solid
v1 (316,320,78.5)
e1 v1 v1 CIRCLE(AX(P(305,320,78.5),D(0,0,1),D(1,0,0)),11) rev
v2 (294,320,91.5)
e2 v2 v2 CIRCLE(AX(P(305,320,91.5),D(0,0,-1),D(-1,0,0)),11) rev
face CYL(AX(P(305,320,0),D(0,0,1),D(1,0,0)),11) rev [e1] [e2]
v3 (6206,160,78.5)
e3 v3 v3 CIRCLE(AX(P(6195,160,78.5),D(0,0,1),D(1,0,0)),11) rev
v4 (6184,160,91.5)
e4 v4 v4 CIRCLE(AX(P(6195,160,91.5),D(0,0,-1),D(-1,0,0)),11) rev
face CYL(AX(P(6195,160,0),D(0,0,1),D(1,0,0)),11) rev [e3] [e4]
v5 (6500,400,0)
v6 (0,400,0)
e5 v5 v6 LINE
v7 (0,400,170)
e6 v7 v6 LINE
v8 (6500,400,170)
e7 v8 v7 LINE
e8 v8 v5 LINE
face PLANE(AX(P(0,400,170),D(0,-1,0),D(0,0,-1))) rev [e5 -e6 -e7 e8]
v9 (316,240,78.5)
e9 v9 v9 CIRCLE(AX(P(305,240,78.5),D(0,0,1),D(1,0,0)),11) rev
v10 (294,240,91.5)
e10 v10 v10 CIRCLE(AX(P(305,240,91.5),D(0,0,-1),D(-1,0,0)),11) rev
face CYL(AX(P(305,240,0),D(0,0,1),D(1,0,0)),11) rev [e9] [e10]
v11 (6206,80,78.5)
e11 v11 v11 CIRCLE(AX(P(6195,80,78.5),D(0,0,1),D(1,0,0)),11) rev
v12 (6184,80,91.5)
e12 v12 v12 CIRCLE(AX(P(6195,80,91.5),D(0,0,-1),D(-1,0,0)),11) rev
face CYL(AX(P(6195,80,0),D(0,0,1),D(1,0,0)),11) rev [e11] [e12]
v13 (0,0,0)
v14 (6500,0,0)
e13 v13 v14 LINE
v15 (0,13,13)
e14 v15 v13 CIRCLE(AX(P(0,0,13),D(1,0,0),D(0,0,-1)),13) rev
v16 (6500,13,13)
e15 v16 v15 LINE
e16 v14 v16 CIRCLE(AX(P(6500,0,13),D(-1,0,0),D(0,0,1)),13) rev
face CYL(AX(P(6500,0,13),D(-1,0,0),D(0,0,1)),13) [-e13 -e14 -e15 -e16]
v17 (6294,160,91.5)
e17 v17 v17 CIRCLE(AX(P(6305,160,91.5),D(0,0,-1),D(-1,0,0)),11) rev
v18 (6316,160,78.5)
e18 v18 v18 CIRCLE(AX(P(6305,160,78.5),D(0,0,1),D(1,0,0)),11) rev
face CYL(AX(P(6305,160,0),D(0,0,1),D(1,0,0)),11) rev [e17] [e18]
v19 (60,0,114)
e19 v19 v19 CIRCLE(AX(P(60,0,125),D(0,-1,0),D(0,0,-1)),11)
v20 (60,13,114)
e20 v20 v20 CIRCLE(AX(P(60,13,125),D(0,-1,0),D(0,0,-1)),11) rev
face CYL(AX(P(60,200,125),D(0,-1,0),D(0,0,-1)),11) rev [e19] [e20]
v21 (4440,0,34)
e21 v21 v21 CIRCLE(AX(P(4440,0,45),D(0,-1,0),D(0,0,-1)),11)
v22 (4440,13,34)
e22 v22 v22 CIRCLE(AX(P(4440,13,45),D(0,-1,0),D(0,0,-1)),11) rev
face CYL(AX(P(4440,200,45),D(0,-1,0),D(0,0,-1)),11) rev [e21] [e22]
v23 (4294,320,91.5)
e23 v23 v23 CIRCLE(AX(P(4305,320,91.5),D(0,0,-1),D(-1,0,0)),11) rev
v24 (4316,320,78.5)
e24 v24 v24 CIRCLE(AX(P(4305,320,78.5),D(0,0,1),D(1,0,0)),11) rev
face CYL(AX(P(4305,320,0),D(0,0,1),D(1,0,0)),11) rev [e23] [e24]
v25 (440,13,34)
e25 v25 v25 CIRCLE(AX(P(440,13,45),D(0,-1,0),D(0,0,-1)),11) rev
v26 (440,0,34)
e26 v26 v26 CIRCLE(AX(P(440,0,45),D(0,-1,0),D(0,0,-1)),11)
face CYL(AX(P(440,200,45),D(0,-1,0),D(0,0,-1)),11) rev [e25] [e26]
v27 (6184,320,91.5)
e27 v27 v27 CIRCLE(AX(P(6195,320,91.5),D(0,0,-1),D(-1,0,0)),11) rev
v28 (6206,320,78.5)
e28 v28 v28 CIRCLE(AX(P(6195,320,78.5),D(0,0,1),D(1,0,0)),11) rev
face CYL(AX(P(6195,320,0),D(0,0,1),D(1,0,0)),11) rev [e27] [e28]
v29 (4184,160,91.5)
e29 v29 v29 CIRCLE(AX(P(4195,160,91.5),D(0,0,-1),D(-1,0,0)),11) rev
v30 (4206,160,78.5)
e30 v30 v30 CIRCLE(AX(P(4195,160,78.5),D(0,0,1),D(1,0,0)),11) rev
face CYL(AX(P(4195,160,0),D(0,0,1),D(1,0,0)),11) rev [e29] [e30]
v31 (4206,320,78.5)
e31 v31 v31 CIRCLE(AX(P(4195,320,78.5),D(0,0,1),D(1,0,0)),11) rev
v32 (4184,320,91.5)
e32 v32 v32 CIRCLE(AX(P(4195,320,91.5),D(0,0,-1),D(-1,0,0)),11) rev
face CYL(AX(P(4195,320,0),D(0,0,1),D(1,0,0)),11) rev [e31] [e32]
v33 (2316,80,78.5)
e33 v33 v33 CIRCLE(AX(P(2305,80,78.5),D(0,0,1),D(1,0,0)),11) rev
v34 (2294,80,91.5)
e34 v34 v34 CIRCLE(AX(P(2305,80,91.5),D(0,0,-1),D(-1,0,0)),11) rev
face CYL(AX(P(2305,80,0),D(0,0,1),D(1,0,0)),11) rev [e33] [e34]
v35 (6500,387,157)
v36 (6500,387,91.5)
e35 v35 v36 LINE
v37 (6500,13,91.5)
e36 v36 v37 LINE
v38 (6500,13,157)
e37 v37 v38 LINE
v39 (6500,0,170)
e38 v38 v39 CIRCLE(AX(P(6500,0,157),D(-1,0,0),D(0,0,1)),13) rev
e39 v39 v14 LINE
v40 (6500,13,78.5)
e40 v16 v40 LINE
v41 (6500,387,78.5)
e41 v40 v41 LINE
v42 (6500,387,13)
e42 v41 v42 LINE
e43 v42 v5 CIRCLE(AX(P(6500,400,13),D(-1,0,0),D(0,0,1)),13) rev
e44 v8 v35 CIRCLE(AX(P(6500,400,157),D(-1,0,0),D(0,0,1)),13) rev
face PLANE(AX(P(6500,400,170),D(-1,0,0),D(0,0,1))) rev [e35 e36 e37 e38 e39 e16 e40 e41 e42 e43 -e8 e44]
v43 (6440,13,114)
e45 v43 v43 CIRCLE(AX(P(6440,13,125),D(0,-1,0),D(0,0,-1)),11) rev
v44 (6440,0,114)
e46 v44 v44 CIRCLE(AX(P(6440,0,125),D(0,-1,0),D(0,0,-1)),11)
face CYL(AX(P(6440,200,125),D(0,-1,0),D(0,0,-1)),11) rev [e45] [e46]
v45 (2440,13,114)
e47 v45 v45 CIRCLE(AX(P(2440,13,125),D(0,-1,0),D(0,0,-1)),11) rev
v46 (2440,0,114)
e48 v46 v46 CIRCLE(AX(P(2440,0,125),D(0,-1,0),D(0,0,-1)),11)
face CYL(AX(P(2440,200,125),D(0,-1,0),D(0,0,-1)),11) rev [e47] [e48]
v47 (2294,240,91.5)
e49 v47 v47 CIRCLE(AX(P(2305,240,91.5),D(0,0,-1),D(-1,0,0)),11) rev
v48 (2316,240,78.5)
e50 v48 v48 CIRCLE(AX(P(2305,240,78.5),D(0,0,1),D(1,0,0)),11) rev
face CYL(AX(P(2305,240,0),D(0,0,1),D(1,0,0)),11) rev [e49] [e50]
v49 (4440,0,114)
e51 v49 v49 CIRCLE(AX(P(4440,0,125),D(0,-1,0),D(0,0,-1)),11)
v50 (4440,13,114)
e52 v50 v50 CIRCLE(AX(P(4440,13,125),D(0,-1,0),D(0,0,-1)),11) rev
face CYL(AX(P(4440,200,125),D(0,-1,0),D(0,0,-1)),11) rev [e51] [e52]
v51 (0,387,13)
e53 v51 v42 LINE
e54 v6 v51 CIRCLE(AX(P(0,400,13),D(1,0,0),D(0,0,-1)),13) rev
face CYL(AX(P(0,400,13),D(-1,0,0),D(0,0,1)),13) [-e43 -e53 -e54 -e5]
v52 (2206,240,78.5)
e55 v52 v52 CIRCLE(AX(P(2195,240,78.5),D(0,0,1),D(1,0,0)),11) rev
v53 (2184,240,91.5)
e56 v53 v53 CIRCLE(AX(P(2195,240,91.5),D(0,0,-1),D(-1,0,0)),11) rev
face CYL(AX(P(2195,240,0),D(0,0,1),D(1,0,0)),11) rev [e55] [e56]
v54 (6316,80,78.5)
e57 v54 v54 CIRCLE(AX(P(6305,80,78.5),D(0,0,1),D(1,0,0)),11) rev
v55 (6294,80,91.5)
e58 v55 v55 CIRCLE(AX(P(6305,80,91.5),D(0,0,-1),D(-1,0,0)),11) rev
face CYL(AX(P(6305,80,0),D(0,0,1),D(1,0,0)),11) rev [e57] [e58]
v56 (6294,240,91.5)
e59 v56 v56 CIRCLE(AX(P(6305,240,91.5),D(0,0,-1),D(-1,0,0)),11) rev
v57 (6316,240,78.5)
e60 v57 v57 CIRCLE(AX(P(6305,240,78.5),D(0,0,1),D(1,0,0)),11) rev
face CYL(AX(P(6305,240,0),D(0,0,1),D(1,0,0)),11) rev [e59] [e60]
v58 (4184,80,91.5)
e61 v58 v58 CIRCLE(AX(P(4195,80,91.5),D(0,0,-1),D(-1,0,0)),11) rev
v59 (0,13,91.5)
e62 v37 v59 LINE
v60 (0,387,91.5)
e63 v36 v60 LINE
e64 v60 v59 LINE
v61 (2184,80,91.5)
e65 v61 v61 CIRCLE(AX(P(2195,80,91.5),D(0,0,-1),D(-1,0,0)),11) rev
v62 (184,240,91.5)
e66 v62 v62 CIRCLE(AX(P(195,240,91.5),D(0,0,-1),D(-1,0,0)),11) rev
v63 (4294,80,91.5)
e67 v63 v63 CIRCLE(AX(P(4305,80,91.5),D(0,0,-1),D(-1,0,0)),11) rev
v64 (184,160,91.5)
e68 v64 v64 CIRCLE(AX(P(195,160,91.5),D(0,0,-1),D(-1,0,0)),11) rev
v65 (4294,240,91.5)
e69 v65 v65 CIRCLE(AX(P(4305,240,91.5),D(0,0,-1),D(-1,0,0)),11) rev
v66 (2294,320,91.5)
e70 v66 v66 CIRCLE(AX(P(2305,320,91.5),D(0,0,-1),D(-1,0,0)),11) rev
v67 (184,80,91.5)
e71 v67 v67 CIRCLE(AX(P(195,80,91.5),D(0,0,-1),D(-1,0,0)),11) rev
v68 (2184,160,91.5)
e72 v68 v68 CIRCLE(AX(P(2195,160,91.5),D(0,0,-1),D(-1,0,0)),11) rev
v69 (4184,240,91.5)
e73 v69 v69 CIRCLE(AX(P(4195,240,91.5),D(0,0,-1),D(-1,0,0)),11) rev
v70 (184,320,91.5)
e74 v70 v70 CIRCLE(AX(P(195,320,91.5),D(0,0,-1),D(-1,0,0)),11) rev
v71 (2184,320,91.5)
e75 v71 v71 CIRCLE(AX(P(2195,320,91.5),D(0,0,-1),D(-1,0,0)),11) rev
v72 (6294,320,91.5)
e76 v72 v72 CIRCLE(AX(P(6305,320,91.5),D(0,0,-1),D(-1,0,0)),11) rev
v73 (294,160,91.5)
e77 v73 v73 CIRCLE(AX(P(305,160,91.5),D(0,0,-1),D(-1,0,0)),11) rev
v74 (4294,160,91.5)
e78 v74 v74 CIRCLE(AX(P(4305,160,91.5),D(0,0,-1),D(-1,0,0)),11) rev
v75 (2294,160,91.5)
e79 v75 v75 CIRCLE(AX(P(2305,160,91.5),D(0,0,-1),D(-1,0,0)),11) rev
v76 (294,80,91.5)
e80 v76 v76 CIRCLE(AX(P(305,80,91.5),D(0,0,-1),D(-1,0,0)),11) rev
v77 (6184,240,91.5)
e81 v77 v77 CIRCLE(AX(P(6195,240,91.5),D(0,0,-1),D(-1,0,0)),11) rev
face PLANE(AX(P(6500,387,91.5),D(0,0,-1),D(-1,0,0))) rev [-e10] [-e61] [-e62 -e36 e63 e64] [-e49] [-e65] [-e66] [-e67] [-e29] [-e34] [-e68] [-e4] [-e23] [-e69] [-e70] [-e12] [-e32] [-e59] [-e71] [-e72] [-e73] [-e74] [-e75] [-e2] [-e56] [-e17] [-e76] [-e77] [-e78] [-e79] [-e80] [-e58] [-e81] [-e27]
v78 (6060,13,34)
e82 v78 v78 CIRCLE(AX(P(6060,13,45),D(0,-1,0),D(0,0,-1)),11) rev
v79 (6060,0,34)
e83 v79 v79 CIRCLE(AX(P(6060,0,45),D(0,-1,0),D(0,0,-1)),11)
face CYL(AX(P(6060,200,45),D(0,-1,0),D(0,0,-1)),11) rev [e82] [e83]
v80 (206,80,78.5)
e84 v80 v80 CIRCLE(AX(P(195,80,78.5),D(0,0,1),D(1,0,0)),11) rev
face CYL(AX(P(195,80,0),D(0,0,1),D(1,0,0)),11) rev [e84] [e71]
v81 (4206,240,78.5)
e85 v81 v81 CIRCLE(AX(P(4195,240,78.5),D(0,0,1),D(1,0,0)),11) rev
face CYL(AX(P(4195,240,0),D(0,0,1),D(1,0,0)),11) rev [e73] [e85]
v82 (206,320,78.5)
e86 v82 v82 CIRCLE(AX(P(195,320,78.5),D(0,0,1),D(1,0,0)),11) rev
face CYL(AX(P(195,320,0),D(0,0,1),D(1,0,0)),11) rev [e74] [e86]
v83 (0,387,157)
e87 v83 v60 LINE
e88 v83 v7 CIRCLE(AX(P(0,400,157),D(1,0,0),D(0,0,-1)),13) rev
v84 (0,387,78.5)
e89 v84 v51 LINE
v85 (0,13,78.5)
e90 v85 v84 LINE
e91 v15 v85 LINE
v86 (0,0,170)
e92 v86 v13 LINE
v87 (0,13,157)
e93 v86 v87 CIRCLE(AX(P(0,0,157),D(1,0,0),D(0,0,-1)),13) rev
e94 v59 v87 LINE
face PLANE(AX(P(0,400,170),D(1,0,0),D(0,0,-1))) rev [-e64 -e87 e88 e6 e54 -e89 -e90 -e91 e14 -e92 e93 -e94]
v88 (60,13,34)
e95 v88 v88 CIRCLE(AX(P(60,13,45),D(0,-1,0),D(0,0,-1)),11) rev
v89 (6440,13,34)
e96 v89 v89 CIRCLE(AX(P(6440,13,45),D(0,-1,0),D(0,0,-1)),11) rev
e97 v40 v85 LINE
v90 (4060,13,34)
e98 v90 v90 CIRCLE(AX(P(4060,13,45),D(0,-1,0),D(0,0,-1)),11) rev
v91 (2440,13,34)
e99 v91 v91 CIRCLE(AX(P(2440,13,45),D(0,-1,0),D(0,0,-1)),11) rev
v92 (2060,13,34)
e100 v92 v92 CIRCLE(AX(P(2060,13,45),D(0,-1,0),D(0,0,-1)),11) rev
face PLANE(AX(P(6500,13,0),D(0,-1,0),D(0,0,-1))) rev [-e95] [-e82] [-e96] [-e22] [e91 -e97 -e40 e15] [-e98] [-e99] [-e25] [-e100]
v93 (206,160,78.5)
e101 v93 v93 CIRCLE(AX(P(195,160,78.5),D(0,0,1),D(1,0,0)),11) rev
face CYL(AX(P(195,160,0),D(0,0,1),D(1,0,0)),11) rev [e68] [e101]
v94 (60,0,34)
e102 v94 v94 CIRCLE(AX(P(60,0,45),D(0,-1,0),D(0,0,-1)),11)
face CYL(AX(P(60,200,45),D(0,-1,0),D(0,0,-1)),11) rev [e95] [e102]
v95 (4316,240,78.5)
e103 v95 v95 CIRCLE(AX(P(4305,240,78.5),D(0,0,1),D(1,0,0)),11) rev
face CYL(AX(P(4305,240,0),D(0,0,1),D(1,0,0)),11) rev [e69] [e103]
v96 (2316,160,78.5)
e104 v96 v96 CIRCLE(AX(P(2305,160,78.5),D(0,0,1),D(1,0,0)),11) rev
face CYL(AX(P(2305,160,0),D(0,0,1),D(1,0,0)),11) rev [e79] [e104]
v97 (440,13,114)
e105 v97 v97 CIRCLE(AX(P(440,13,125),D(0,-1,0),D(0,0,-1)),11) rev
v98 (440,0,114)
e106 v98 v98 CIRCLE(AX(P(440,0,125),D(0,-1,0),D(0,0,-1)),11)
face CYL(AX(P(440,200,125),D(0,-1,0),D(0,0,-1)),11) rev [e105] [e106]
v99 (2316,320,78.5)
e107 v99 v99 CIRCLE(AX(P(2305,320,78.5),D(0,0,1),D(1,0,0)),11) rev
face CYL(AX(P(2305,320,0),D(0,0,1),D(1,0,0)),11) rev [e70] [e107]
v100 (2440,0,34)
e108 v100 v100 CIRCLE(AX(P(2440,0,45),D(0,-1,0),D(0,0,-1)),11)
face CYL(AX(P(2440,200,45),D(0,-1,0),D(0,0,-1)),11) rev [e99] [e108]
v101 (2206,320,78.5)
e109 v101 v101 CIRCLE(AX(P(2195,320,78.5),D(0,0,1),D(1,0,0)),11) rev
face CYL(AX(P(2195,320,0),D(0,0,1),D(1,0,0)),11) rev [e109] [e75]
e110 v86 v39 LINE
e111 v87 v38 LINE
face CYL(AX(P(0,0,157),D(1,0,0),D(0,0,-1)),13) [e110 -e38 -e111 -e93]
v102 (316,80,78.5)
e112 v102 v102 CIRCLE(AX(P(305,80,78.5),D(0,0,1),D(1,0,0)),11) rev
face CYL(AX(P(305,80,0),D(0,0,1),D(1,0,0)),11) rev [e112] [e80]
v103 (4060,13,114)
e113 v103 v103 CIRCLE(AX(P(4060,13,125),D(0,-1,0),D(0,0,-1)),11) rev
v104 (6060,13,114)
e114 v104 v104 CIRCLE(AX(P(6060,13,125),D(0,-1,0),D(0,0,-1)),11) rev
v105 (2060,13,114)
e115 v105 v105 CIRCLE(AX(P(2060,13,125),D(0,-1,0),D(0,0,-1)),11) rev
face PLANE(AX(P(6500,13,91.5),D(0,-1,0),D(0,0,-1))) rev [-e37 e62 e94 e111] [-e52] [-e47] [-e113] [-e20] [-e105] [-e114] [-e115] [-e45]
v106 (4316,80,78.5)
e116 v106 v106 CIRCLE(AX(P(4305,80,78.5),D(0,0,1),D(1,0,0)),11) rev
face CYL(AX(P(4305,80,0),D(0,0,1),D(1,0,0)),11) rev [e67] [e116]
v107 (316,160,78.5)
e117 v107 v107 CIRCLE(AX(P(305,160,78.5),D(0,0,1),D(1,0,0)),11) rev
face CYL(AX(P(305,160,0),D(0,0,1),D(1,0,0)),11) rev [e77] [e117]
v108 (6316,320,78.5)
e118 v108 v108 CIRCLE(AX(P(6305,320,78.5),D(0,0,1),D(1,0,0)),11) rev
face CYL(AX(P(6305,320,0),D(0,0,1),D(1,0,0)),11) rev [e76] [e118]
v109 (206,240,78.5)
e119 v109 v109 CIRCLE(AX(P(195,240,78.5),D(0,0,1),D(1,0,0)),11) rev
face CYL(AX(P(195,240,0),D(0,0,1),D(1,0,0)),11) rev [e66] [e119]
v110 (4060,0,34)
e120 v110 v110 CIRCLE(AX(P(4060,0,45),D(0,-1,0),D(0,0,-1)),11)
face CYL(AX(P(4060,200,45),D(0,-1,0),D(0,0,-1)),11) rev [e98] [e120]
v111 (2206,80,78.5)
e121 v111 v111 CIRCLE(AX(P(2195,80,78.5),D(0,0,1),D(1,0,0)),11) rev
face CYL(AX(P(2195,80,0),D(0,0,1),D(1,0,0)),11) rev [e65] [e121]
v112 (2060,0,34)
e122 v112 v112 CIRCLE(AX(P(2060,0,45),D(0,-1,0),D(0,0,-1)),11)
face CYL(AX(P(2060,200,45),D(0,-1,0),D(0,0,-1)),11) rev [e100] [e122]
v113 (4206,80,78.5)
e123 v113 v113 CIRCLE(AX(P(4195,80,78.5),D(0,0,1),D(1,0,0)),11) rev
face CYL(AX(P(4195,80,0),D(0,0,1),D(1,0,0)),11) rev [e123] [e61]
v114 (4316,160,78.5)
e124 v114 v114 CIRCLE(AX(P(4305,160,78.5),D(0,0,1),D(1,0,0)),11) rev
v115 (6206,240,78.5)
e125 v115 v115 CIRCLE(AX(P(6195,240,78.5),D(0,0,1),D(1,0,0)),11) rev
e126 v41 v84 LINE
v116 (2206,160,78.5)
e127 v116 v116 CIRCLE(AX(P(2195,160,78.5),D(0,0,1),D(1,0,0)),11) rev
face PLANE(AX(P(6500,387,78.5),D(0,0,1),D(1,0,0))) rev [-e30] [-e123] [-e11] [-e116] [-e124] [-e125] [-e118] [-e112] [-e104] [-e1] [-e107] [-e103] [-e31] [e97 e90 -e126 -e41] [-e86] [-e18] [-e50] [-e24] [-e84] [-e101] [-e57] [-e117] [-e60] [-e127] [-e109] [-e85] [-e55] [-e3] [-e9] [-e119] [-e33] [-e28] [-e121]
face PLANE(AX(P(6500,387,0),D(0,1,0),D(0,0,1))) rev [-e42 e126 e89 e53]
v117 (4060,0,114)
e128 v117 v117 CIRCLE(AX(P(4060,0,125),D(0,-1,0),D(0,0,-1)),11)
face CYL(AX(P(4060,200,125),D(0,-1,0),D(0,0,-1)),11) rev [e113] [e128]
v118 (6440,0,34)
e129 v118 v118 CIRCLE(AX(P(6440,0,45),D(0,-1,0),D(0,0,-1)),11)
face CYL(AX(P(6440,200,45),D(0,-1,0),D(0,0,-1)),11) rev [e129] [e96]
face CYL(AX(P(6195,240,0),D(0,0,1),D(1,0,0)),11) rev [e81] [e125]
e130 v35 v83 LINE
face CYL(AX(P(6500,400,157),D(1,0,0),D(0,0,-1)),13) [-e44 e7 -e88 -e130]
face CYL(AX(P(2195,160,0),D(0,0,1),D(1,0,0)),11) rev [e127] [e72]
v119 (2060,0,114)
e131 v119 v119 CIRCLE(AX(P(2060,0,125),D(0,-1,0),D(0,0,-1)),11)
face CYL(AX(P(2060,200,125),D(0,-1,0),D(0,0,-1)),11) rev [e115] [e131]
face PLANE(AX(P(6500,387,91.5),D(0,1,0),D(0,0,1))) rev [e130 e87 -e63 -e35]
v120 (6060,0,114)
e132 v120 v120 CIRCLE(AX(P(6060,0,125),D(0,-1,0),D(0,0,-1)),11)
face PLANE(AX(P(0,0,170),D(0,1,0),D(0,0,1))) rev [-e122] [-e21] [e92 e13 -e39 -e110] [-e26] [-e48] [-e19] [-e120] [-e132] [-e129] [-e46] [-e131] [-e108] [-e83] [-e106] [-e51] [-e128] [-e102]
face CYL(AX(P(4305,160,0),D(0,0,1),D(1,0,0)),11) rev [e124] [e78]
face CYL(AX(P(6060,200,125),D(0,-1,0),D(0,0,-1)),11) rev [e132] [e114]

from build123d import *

# Parameters (mm, degrees)
SKETCH_1_W                        = 6500
SKETCH_1_H                        = 400
EXTRUDE_1_DEPTH                   = 170
SKETCH_2_R                        = 11
CUT_EXTRUDE_1_DEPTH               = 6515.514563649
PATTERN_LINEAR_1_COUNT            = 4
PATTERN_LINEAR_1_PITCH            = 80
PATTERN_LINEAR_2_COUNT            = 2
PATTERN_LINEAR_2_PITCH            = 110
PATTERN_LINEAR_2_COPY_1_SKETCH_R  = 11
PATTERN_LINEAR_2_COPY_1_DEPTH     = 6515.514563649
PATTERN_LINEAR_2_COPY_2_SKETCH_R  = 11
PATTERN_LINEAR_2_COPY_2_DEPTH     = 6515.514563649
PATTERN_LINEAR_2_COPY_3_SKETCH_R  = 11
PATTERN_LINEAR_2_COPY_3_DEPTH     = 6515.514563649
PATTERN_LINEAR_3_COUNT            = 4
PATTERN_LINEAR_3_PITCH            = 2000
PATTERN_LINEAR_3_COPY_1_SKETCH_R  = 11
PATTERN_LINEAR_3_COPY_1_DEPTH     = 6515.514563649
PATTERN_LINEAR_3_COPY_2_SKETCH_R  = 11
PATTERN_LINEAR_3_COPY_2_DEPTH     = 6515.514563649
PATTERN_LINEAR_3_COPY_3_SKETCH_R  = 11
PATTERN_LINEAR_3_COPY_3_DEPTH     = 6515.514563649
PATTERN_LINEAR_3_COPY_4_SKETCH_R  = 11
PATTERN_LINEAR_3_COPY_4_DEPTH     = 6515.514563649
PATTERN_LINEAR_3_COPY_5_SKETCH_R  = 11
PATTERN_LINEAR_3_COPY_5_DEPTH     = 6515.514563649
PATTERN_LINEAR_3_COPY_6_SKETCH_R  = 11
PATTERN_LINEAR_3_COPY_6_DEPTH     = 6515.514563649
PATTERN_LINEAR_3_COPY_7_SKETCH_R  = 11
PATTERN_LINEAR_3_COPY_7_DEPTH     = 6515.514563649
PATTERN_LINEAR_3_COPY_8_SKETCH_R  = 11
PATTERN_LINEAR_3_COPY_8_DEPTH     = 6515.514563649
PATTERN_LINEAR_3_COPY_9_SKETCH_R  = 11
PATTERN_LINEAR_3_COPY_9_DEPTH     = 6515.514563649
PATTERN_LINEAR_3_COPY_10_SKETCH_R = 11
PATTERN_LINEAR_3_COPY_10_DEPTH    = 6515.514563649
PATTERN_LINEAR_3_COPY_11_SKETCH_R = 11
PATTERN_LINEAR_3_COPY_11_DEPTH    = 6515.514563649
PATTERN_LINEAR_3_COPY_12_SKETCH_R = 11
PATTERN_LINEAR_3_COPY_12_DEPTH    = 6515.514563649
PATTERN_LINEAR_3_COPY_13_SKETCH_R = 11
PATTERN_LINEAR_3_COPY_13_DEPTH    = 6515.514563649
PATTERN_LINEAR_3_COPY_14_SKETCH_R = 11
PATTERN_LINEAR_3_COPY_14_DEPTH    = 6515.514563649
PATTERN_LINEAR_3_COPY_15_SKETCH_R = 11
PATTERN_LINEAR_3_COPY_15_DEPTH    = 6515.514563649
PATTERN_LINEAR_3_COPY_16_SKETCH_R = 11
PATTERN_LINEAR_3_COPY_16_DEPTH    = 6515.514563649
PATTERN_LINEAR_3_COPY_17_SKETCH_R = 11
PATTERN_LINEAR_3_COPY_17_DEPTH    = 6515.514563649
PATTERN_LINEAR_3_COPY_18_SKETCH_R = 11
PATTERN_LINEAR_3_COPY_18_DEPTH    = 6515.514563649
PATTERN_LINEAR_3_COPY_19_SKETCH_R = 11
PATTERN_LINEAR_3_COPY_19_DEPTH    = 6515.514563649
PATTERN_LINEAR_3_COPY_20_SKETCH_R = 11
PATTERN_LINEAR_3_COPY_20_DEPTH    = 6515.514563649
PATTERN_LINEAR_3_COPY_21_SKETCH_R = 11
PATTERN_LINEAR_3_COPY_21_DEPTH    = 6515.514563649
SKETCH_3_R                        = 11
CUT_EXTRUDE_2_DEPTH               = 200
PATTERN_LINEAR_4_COUNT            = 2
PATTERN_LINEAR_4_PITCH            = 80
PATTERN_LINEAR_5_COUNT            = 2
PATTERN_LINEAR_5_PITCH            = 380
PATTERN_LINEAR_5_COPY_1_SKETCH_R  = 11
PATTERN_LINEAR_5_COPY_1_DEPTH     = 200
PATTERN_LINEAR_6_COUNT            = 4
PATTERN_LINEAR_6_PITCH            = 2000
PATTERN_LINEAR_6_COPY_1_SKETCH_R  = 11
PATTERN_LINEAR_6_COPY_1_DEPTH     = 200
PATTERN_LINEAR_6_COPY_2_SKETCH_R  = 11
PATTERN_LINEAR_6_COPY_2_DEPTH     = 200
PATTERN_LINEAR_6_COPY_3_SKETCH_R  = 11
PATTERN_LINEAR_6_COPY_3_DEPTH     = 200
PATTERN_LINEAR_6_COPY_4_SKETCH_R  = 11
PATTERN_LINEAR_6_COPY_4_DEPTH     = 200
PATTERN_LINEAR_6_COPY_5_SKETCH_R  = 11
PATTERN_LINEAR_6_COPY_5_DEPTH     = 200
PATTERN_LINEAR_6_COPY_6_SKETCH_R  = 11
PATTERN_LINEAR_6_COPY_6_DEPTH     = 200
PATTERN_LINEAR_6_COPY_7_SKETCH_R  = 11
PATTERN_LINEAR_6_COPY_7_DEPTH     = 200
PATTERN_LINEAR_6_COPY_8_SKETCH_R  = 11
PATTERN_LINEAR_6_COPY_8_DEPTH     = 200
PATTERN_LINEAR_6_COPY_9_SKETCH_R  = 11
PATTERN_LINEAR_6_COPY_9_DEPTH     = 200
SKETCH_5_W                        = 78.5
SKETCH_5_H                        = 374
CUT_EXTRUDE_3_DEPTH               = 6515.514563649
FILLET_1_R                        = 13
FILLET_2_R                        = 13
FILLET_3_R                        = 13
FILLET_4_R                        = 13


with BuildPart() as part:
    # 草图1 → 拉伸1 (new body)
    with BuildSketch(Plane.XY):
        with Locations((3250, 200)):
            Rectangle(SKETCH_1_W, SKETCH_1_H)
    extrude(amount=EXTRUDE_1_DEPTH)

    # 草图2 → 切除-拉伸1 (cut, through all)
    with BuildSketch(Plane.XY.offset(170)):
        with Locations((195, 80)):
            Circle(SKETCH_2_R)
    cut_extrude_1 = extrude(amount=-CUT_EXTRUDE_1_DEPTH, mode=Mode.SUBTRACT)

    # 阵列(线性)1: 切除-拉伸1 ×4
    with Locations(*[(0, i * PATTERN_LINEAR_1_PITCH, 0) for i in range(1, PATTERN_LINEAR_1_COUNT)]):
        add(cut_extrude_1, mode=Mode.SUBTRACT)

    # 阵列(线性)2: 切除-拉伸1 ×2
    with Locations(*[(i * PATTERN_LINEAR_2_PITCH, 0, 0) for i in range(1, PATTERN_LINEAR_2_COUNT)]):
        add(cut_extrude_1, mode=Mode.SUBTRACT)

    # 阵列(线性)2 copy 1 sketch → 阵列(线性)2 copy 1 (cut, through all)
    with BuildSketch(Plane(origin=(110, 80, 170), x_dir=(1, 0, 0), z_dir=(0, 0, 1))):
        with Locations((195, 80)):
            Circle(PATTERN_LINEAR_2_COPY_1_SKETCH_R)
    extrude(amount=-PATTERN_LINEAR_2_COPY_1_DEPTH, mode=Mode.SUBTRACT)

    # 阵列(线性)2 copy 2 sketch → 阵列(线性)2 copy 2 (cut, through all)
    with BuildSketch(Plane(origin=(110, 160, 170), x_dir=(1, 0, 0), z_dir=(0, 0, 1))):
        with Locations((195, 80)):
            Circle(PATTERN_LINEAR_2_COPY_2_SKETCH_R)
    extrude(amount=-PATTERN_LINEAR_2_COPY_2_DEPTH, mode=Mode.SUBTRACT)

    # 阵列(线性)2 copy 3 sketch → 阵列(线性)2 copy 3 (cut, through all)
    with BuildSketch(Plane(origin=(110, 240, 170), x_dir=(1, 0, 0), z_dir=(0, 0, 1))):
        with Locations((195, 80)):
            Circle(PATTERN_LINEAR_2_COPY_3_SKETCH_R)
    extrude(amount=-PATTERN_LINEAR_2_COPY_3_DEPTH, mode=Mode.SUBTRACT)

    # 阵列(线性)3: 切除-拉伸1 ×4
    with Locations(*[(i * PATTERN_LINEAR_3_PITCH, 0, 0) for i in range(1, PATTERN_LINEAR_3_COUNT)]):
        add(cut_extrude_1, mode=Mode.SUBTRACT)

    # 阵列(线性)3 copy 1 sketch → 阵列(线性)3 copy 1 (cut, through all)
    with BuildSketch(Plane(origin=(2000, 80, 170), x_dir=(1, 0, 0), z_dir=(0, 0, 1))):
        with Locations((195, 80)):
            Circle(PATTERN_LINEAR_3_COPY_1_SKETCH_R)
    extrude(amount=-PATTERN_LINEAR_3_COPY_1_DEPTH, mode=Mode.SUBTRACT)

    # 阵列(线性)3 copy 2 sketch → 阵列(线性)3 copy 2 (cut, through all)
    with BuildSketch(Plane(origin=(4000, 80, 170), x_dir=(1, 0, 0), z_dir=(0, 0, 1))):
        with Locations((195, 80)):
            Circle(PATTERN_LINEAR_3_COPY_2_SKETCH_R)
    extrude(amount=-PATTERN_LINEAR_3_COPY_2_DEPTH, mode=Mode.SUBTRACT)

    # 阵列(线性)3 copy 3 sketch → 阵列(线性)3 copy 3 (cut, through all)
    with BuildSketch(Plane(origin=(6000, 80, 170), x_dir=(1, 0, 0), z_dir=(0, 0, 1))):
        with Locations((195, 80)):
            Circle(PATTERN_LINEAR_3_COPY_3_SKETCH_R)
    extrude(amount=-PATTERN_LINEAR_3_COPY_3_DEPTH, mode=Mode.SUBTRACT)

    # 阵列(线性)3 copy 4 sketch → 阵列(线性)3 copy 4 (cut, through all)
    with BuildSketch(Plane(origin=(2000, 160, 170), x_dir=(1, 0, 0), z_dir=(0, 0, 1))):
        with Locations((195, 80)):
            Circle(PATTERN_LINEAR_3_COPY_4_SKETCH_R)
    extrude(amount=-PATTERN_LINEAR_3_COPY_4_DEPTH, mode=Mode.SUBTRACT)

    # 阵列(线性)3 copy 5 sketch → 阵列(线性)3 copy 5 (cut, through all)
    with BuildSketch(Plane(origin=(4000, 160, 170), x_dir=(1, 0, 0), z_dir=(0, 0, 1))):
        with Locations((195, 80)):
            Circle(PATTERN_LINEAR_3_COPY_5_SKETCH_R)
    extrude(amount=-PATTERN_LINEAR_3_COPY_5_DEPTH, mode=Mode.SUBTRACT)

    # 阵列(线性)3 copy 6 sketch → 阵列(线性)3 copy 6 (cut, through all)
    with BuildSketch(Plane(origin=(6000, 160, 170), x_dir=(1, 0, 0), z_dir=(0, 0, 1))):
        with Locations((195, 80)):
            Circle(PATTERN_LINEAR_3_COPY_6_SKETCH_R)
    extrude(amount=-PATTERN_LINEAR_3_COPY_6_DEPTH, mode=Mode.SUBTRACT)

    # 阵列(线性)3 copy 7 sketch → 阵列(线性)3 copy 7 (cut, through all)
    with BuildSketch(Plane(origin=(2000, 240, 170), x_dir=(1, 0, 0), z_dir=(0, 0, 1))):
        with Locations((195, 80)):
            Circle(PATTERN_LINEAR_3_COPY_7_SKETCH_R)
    extrude(amount=-PATTERN_LINEAR_3_COPY_7_DEPTH, mode=Mode.SUBTRACT)

    # 阵列(线性)3 copy 8 sketch → 阵列(线性)3 copy 8 (cut, through all)
    with BuildSketch(Plane(origin=(4000, 240, 170), x_dir=(1, 0, 0), z_dir=(0, 0, 1))):
        with Locations((195, 80)):
            Circle(PATTERN_LINEAR_3_COPY_8_SKETCH_R)
    extrude(amount=-PATTERN_LINEAR_3_COPY_8_DEPTH, mode=Mode.SUBTRACT)

    # 阵列(线性)3 copy 9 sketch → 阵列(线性)3 copy 9 (cut, through all)
    with BuildSketch(Plane(origin=(6000, 240, 170), x_dir=(1, 0, 0), z_dir=(0, 0, 1))):
        with Locations((195, 80)):
            Circle(PATTERN_LINEAR_3_COPY_9_SKETCH_R)
    extrude(amount=-PATTERN_LINEAR_3_COPY_9_DEPTH, mode=Mode.SUBTRACT)

    # 阵列(线性)3 copy 10 sketch → 阵列(线性)3 copy 10 (cut, through all)
    with BuildSketch(Plane(origin=(2110, 0, 170), x_dir=(1, 0, 0), z_dir=(0, 0, 1))):
        with Locations((195, 80)):
            Circle(PATTERN_LINEAR_3_COPY_10_SKETCH_R)
    extrude(amount=-PATTERN_LINEAR_3_COPY_10_DEPTH, mode=Mode.SUBTRACT)

    # 阵列(线性)3 copy 11 sketch → 阵列(线性)3 copy 11 (cut, through all)
    with BuildSketch(Plane(origin=(4110, 0, 170), x_dir=(1, 0, 0), z_dir=(0, 0, 1))):
        with Locations((195, 80)):
            Circle(PATTERN_LINEAR_3_COPY_11_SKETCH_R)
    extrude(amount=-PATTERN_LINEAR_3_COPY_11_DEPTH, mode=Mode.SUBTRACT)

    # 阵列(线性)3 copy 12 sketch → 阵列(线性)3 copy 12 (cut, through all)
    with BuildSketch(Plane(origin=(6110, 0, 170), x_dir=(1, 0, 0), z_dir=(0, 0, 1))):
        with Locations((195, 80)):
            Circle(PATTERN_LINEAR_3_COPY_12_SKETCH_R)
    extrude(amount=-PATTERN_LINEAR_3_COPY_12_DEPTH, mode=Mode.SUBTRACT)

    # 阵列(线性)3 copy 13 sketch → 阵列(线性)3 copy 13 (cut, through all)
    with BuildSketch(Plane(origin=(2110, 80, 170), x_dir=(1, 0, 0), z_dir=(0, 0, 1))):
        with Locations((195, 80)):
            Circle(PATTERN_LINEAR_3_COPY_13_SKETCH_R)
    extrude(amount=-PATTERN_LINEAR_3_COPY_13_DEPTH, mode=Mode.SUBTRACT)

    # 阵列(线性)3 copy 14 sketch → 阵列(线性)3 copy 14 (cut, through all)
    with BuildSketch(Plane(origin=(4110, 80, 170), x_dir=(1, 0, 0), z_dir=(0, 0, 1))):
        with Locations((195, 80)):
            Circle(PATTERN_LINEAR_3_COPY_14_SKETCH_R)
    extrude(amount=-PATTERN_LINEAR_3_COPY_14_DEPTH, mode=Mode.SUBTRACT)

    # 阵列(线性)3 copy 15 sketch → 阵列(线性)3 copy 15 (cut, through all)
    with BuildSketch(Plane(origin=(6110, 80, 170), x_dir=(1, 0, 0), z_dir=(0, 0, 1))):
        with Locations((195, 80)):
            Circle(PATTERN_LINEAR_3_COPY_15_SKETCH_R)
    extrude(amount=-PATTERN_LINEAR_3_COPY_15_DEPTH, mode=Mode.SUBTRACT)

    # 阵列(线性)3 copy 16 sketch → 阵列(线性)3 copy 16 (cut, through all)
    with BuildSketch(Plane(origin=(2110, 160, 170), x_dir=(1, 0, 0), z_dir=(0, 0, 1))):
        with Locations((195, 80)):
            Circle(PATTERN_LINEAR_3_COPY_16_SKETCH_R)
    extrude(amount=-PATTERN_LINEAR_3_COPY_16_DEPTH, mode=Mode.SUBTRACT)

    # 阵列(线性)3 copy 17 sketch → 阵列(线性)3 copy 17 (cut, through all)
    with BuildSketch(Plane(origin=(4110, 160, 170), x_dir=(1, 0, 0), z_dir=(0, 0, 1))):
        with Locations((195, 80)):
            Circle(PATTERN_LINEAR_3_COPY_17_SKETCH_R)
    extrude(amount=-PATTERN_LINEAR_3_COPY_17_DEPTH, mode=Mode.SUBTRACT)

    # 阵列(线性)3 copy 18 sketch → 阵列(线性)3 copy 18 (cut, through all)
    with BuildSketch(Plane(origin=(6110, 160, 170), x_dir=(1, 0, 0), z_dir=(0, 0, 1))):
        with Locations((195, 80)):
            Circle(PATTERN_LINEAR_3_COPY_18_SKETCH_R)
    extrude(amount=-PATTERN_LINEAR_3_COPY_18_DEPTH, mode=Mode.SUBTRACT)

    # 阵列(线性)3 copy 19 sketch → 阵列(线性)3 copy 19 (cut, through all)
    with BuildSketch(Plane(origin=(2110, 240, 170), x_dir=(1, 0, 0), z_dir=(0, 0, 1))):
        with Locations((195, 80)):
            Circle(PATTERN_LINEAR_3_COPY_19_SKETCH_R)
    extrude(amount=-PATTERN_LINEAR_3_COPY_19_DEPTH, mode=Mode.SUBTRACT)

    # 阵列(线性)3 copy 20 sketch → 阵列(线性)3 copy 20 (cut, through all)
    with BuildSketch(Plane(origin=(4110, 240, 170), x_dir=(1, 0, 0), z_dir=(0, 0, 1))):
        with Locations((195, 80)):
            Circle(PATTERN_LINEAR_3_COPY_20_SKETCH_R)
    extrude(amount=-PATTERN_LINEAR_3_COPY_20_DEPTH, mode=Mode.SUBTRACT)

    # 阵列(线性)3 copy 21 sketch → 阵列(线性)3 copy 21 (cut, through all)
    with BuildSketch(Plane(origin=(6110, 240, 170), x_dir=(1, 0, 0), z_dir=(0, 0, 1))):
        with Locations((195, 80)):
            Circle(PATTERN_LINEAR_3_COPY_21_SKETCH_R)
    extrude(amount=-PATTERN_LINEAR_3_COPY_21_DEPTH, mode=Mode.SUBTRACT)

    # 草图3 → 切除-拉伸2 (cut)
    with BuildSketch(Plane.XZ):
        with Locations(Location((60, 45, 0), (0, 0, 270))):
            Circle(SKETCH_3_R)
    cut_extrude_2 = extrude(amount=-CUT_EXTRUDE_2_DEPTH, mode=Mode.SUBTRACT)

    # 阵列(线性)4: 切除-拉伸2 ×2
    with Locations(*[(0, 0, i * PATTERN_LINEAR_4_PITCH) for i in range(1, PATTERN_LINEAR_4_COUNT)]):
        add(cut_extrude_2, mode=Mode.SUBTRACT)

    # 阵列(线性)5: 切除-拉伸2 ×2
    with Locations(*[(i * PATTERN_LINEAR_5_PITCH, 0, 0) for i in range(1, PATTERN_LINEAR_5_COUNT)]):
        add(cut_extrude_2, mode=Mode.SUBTRACT)

    # 阵列(线性)5 copy 1 sketch → 阵列(线性)5 copy 1 (cut)
    with BuildSketch(Plane(origin=(380, 0, 80), x_dir=(1, 0, 0), z_dir=(0, -1, 0))):
        with Locations(Location((60, 45, 0), (0, 0, 270))):
            Circle(PATTERN_LINEAR_5_COPY_1_SKETCH_R)
    extrude(amount=-PATTERN_LINEAR_5_COPY_1_DEPTH, mode=Mode.SUBTRACT)

    # 阵列(线性)6: 切除-拉伸2 ×4
    with Locations(*[(i * PATTERN_LINEAR_6_PITCH, 0, 0) for i in range(1, PATTERN_LINEAR_6_COUNT)]):
        add(cut_extrude_2, mode=Mode.SUBTRACT)

    # 阵列(线性)6 copy 1 sketch → 阵列(线性)6 copy 1 (cut)
    with BuildSketch(Plane(origin=(2000, 0, 80), x_dir=(1, 0, 0), z_dir=(0, -1, 0))):
        with Locations(Location((60, 45, 0), (0, 0, 270))):
            Circle(PATTERN_LINEAR_6_COPY_1_SKETCH_R)
    extrude(amount=-PATTERN_LINEAR_6_COPY_1_DEPTH, mode=Mode.SUBTRACT)

    # 阵列(线性)6 copy 2 sketch → 阵列(线性)6 copy 2 (cut)
    with BuildSketch(Plane(origin=(4000, 0, 80), x_dir=(1, 0, 0), z_dir=(0, -1, 0))):
        with Locations(Location((60, 45, 0), (0, 0, 270))):
            Circle(PATTERN_LINEAR_6_COPY_2_SKETCH_R)
    extrude(amount=-PATTERN_LINEAR_6_COPY_2_DEPTH, mode=Mode.SUBTRACT)

    # 阵列(线性)6 copy 3 sketch → 阵列(线性)6 copy 3 (cut)
    with BuildSketch(Plane(origin=(6000, 0, 80), x_dir=(1, 0, 0), z_dir=(0, -1, 0))):
        with Locations(Location((60, 45, 0), (0, 0, 270))):
            Circle(PATTERN_LINEAR_6_COPY_3_SKETCH_R)
    extrude(amount=-PATTERN_LINEAR_6_COPY_3_DEPTH, mode=Mode.SUBTRACT)

    # 阵列(线性)6 copy 4 sketch → 阵列(线性)6 copy 4 (cut)
    with BuildSketch(Plane(origin=(2380, 0, 0), x_dir=(1, 0, 0), z_dir=(0, -1, 0))):
        with Locations(Location((60, 45, 0), (0, 0, 270))):
            Circle(PATTERN_LINEAR_6_COPY_4_SKETCH_R)
    extrude(amount=-PATTERN_LINEAR_6_COPY_4_DEPTH, mode=Mode.SUBTRACT)

    # 阵列(线性)6 copy 5 sketch → 阵列(线性)6 copy 5 (cut)
    with BuildSketch(Plane(origin=(4380, 0, 0), x_dir=(1, 0, 0), z_dir=(0, -1, 0))):
        with Locations(Location((60, 45, 0), (0, 0, 270))):
            Circle(PATTERN_LINEAR_6_COPY_5_SKETCH_R)
    extrude(amount=-PATTERN_LINEAR_6_COPY_5_DEPTH, mode=Mode.SUBTRACT)

    # 阵列(线性)6 copy 6 sketch → 阵列(线性)6 copy 6 (cut)
    with BuildSketch(Plane(origin=(6380, 0, 0), x_dir=(1, 0, 0), z_dir=(0, -1, 0))):
        with Locations(Location((60, 45, 0), (0, 0, 270))):
            Circle(PATTERN_LINEAR_6_COPY_6_SKETCH_R)
    extrude(amount=-PATTERN_LINEAR_6_COPY_6_DEPTH, mode=Mode.SUBTRACT)

    # 阵列(线性)6 copy 7 sketch → 阵列(线性)6 copy 7 (cut)
    with BuildSketch(Plane(origin=(2380, 0, 80), x_dir=(1, 0, 0), z_dir=(0, -1, 0))):
        with Locations(Location((60, 45, 0), (0, 0, 270))):
            Circle(PATTERN_LINEAR_6_COPY_7_SKETCH_R)
    extrude(amount=-PATTERN_LINEAR_6_COPY_7_DEPTH, mode=Mode.SUBTRACT)

    # 阵列(线性)6 copy 8 sketch → 阵列(线性)6 copy 8 (cut)
    with BuildSketch(Plane(origin=(4380, 0, 80), x_dir=(1, 0, 0), z_dir=(0, -1, 0))):
        with Locations(Location((60, 45, 0), (0, 0, 270))):
            Circle(PATTERN_LINEAR_6_COPY_8_SKETCH_R)
    extrude(amount=-PATTERN_LINEAR_6_COPY_8_DEPTH, mode=Mode.SUBTRACT)

    # 阵列(线性)6 copy 9 sketch → 阵列(线性)6 copy 9 (cut)
    with BuildSketch(Plane(origin=(6380, 0, 80), x_dir=(1, 0, 0), z_dir=(0, -1, 0))):
        with Locations(Location((60, 45, 0), (0, 0, 270))):
            Circle(PATTERN_LINEAR_6_COPY_9_SKETCH_R)
    extrude(amount=-PATTERN_LINEAR_6_COPY_9_DEPTH, mode=Mode.SUBTRACT)

    # 草图5 → 切除-拉伸3 (cut, through all)
    with BuildSketch(Plane.ZY):
        with Locations((39.25, 200)):
            Rectangle(SKETCH_5_W, SKETCH_5_H)
        with Locations((130.75, 200)):
            Rectangle(SKETCH_5_W, SKETCH_5_H)
    extrude(amount=-CUT_EXTRUDE_3_DEPTH, mode=Mode.SUBTRACT)

    # 圆角1
    fillet_1_edges = [part.edges().sort_by_distance(p)[0] for p in [
        (3250, 13, 170),
    ]]
    fillet(fillet_1_edges, radius=FILLET_1_R - 0.0001)  # a hair under: the kernel refuses the full size

    # 圆角2
    fillet_2_edges = [part.edges().sort_by_distance(p)[0] for p in [
        (3250, 387, 170),
    ]]
    fillet(fillet_2_edges, radius=FILLET_2_R - 0.0001)  # a hair under: the kernel refuses the full size

    # 圆角3
    fillet_3_edges = [part.edges().sort_by_distance(p)[0] for p in [
        (3250, 13, 0),
    ]]
    fillet(fillet_3_edges, radius=FILLET_3_R - 0.0001)  # a hair under: the kernel refuses the full size

    # 圆角4
    fillet_4_edges = [part.edges().sort_by_distance(p)[0] for p in [
        (3250, 387, 0),
    ]]
    fillet(fillet_4_edges, radius=FILLET_4_R - 0.0001)  # a hair under: the kernel refuses the full size


solid = part.part
